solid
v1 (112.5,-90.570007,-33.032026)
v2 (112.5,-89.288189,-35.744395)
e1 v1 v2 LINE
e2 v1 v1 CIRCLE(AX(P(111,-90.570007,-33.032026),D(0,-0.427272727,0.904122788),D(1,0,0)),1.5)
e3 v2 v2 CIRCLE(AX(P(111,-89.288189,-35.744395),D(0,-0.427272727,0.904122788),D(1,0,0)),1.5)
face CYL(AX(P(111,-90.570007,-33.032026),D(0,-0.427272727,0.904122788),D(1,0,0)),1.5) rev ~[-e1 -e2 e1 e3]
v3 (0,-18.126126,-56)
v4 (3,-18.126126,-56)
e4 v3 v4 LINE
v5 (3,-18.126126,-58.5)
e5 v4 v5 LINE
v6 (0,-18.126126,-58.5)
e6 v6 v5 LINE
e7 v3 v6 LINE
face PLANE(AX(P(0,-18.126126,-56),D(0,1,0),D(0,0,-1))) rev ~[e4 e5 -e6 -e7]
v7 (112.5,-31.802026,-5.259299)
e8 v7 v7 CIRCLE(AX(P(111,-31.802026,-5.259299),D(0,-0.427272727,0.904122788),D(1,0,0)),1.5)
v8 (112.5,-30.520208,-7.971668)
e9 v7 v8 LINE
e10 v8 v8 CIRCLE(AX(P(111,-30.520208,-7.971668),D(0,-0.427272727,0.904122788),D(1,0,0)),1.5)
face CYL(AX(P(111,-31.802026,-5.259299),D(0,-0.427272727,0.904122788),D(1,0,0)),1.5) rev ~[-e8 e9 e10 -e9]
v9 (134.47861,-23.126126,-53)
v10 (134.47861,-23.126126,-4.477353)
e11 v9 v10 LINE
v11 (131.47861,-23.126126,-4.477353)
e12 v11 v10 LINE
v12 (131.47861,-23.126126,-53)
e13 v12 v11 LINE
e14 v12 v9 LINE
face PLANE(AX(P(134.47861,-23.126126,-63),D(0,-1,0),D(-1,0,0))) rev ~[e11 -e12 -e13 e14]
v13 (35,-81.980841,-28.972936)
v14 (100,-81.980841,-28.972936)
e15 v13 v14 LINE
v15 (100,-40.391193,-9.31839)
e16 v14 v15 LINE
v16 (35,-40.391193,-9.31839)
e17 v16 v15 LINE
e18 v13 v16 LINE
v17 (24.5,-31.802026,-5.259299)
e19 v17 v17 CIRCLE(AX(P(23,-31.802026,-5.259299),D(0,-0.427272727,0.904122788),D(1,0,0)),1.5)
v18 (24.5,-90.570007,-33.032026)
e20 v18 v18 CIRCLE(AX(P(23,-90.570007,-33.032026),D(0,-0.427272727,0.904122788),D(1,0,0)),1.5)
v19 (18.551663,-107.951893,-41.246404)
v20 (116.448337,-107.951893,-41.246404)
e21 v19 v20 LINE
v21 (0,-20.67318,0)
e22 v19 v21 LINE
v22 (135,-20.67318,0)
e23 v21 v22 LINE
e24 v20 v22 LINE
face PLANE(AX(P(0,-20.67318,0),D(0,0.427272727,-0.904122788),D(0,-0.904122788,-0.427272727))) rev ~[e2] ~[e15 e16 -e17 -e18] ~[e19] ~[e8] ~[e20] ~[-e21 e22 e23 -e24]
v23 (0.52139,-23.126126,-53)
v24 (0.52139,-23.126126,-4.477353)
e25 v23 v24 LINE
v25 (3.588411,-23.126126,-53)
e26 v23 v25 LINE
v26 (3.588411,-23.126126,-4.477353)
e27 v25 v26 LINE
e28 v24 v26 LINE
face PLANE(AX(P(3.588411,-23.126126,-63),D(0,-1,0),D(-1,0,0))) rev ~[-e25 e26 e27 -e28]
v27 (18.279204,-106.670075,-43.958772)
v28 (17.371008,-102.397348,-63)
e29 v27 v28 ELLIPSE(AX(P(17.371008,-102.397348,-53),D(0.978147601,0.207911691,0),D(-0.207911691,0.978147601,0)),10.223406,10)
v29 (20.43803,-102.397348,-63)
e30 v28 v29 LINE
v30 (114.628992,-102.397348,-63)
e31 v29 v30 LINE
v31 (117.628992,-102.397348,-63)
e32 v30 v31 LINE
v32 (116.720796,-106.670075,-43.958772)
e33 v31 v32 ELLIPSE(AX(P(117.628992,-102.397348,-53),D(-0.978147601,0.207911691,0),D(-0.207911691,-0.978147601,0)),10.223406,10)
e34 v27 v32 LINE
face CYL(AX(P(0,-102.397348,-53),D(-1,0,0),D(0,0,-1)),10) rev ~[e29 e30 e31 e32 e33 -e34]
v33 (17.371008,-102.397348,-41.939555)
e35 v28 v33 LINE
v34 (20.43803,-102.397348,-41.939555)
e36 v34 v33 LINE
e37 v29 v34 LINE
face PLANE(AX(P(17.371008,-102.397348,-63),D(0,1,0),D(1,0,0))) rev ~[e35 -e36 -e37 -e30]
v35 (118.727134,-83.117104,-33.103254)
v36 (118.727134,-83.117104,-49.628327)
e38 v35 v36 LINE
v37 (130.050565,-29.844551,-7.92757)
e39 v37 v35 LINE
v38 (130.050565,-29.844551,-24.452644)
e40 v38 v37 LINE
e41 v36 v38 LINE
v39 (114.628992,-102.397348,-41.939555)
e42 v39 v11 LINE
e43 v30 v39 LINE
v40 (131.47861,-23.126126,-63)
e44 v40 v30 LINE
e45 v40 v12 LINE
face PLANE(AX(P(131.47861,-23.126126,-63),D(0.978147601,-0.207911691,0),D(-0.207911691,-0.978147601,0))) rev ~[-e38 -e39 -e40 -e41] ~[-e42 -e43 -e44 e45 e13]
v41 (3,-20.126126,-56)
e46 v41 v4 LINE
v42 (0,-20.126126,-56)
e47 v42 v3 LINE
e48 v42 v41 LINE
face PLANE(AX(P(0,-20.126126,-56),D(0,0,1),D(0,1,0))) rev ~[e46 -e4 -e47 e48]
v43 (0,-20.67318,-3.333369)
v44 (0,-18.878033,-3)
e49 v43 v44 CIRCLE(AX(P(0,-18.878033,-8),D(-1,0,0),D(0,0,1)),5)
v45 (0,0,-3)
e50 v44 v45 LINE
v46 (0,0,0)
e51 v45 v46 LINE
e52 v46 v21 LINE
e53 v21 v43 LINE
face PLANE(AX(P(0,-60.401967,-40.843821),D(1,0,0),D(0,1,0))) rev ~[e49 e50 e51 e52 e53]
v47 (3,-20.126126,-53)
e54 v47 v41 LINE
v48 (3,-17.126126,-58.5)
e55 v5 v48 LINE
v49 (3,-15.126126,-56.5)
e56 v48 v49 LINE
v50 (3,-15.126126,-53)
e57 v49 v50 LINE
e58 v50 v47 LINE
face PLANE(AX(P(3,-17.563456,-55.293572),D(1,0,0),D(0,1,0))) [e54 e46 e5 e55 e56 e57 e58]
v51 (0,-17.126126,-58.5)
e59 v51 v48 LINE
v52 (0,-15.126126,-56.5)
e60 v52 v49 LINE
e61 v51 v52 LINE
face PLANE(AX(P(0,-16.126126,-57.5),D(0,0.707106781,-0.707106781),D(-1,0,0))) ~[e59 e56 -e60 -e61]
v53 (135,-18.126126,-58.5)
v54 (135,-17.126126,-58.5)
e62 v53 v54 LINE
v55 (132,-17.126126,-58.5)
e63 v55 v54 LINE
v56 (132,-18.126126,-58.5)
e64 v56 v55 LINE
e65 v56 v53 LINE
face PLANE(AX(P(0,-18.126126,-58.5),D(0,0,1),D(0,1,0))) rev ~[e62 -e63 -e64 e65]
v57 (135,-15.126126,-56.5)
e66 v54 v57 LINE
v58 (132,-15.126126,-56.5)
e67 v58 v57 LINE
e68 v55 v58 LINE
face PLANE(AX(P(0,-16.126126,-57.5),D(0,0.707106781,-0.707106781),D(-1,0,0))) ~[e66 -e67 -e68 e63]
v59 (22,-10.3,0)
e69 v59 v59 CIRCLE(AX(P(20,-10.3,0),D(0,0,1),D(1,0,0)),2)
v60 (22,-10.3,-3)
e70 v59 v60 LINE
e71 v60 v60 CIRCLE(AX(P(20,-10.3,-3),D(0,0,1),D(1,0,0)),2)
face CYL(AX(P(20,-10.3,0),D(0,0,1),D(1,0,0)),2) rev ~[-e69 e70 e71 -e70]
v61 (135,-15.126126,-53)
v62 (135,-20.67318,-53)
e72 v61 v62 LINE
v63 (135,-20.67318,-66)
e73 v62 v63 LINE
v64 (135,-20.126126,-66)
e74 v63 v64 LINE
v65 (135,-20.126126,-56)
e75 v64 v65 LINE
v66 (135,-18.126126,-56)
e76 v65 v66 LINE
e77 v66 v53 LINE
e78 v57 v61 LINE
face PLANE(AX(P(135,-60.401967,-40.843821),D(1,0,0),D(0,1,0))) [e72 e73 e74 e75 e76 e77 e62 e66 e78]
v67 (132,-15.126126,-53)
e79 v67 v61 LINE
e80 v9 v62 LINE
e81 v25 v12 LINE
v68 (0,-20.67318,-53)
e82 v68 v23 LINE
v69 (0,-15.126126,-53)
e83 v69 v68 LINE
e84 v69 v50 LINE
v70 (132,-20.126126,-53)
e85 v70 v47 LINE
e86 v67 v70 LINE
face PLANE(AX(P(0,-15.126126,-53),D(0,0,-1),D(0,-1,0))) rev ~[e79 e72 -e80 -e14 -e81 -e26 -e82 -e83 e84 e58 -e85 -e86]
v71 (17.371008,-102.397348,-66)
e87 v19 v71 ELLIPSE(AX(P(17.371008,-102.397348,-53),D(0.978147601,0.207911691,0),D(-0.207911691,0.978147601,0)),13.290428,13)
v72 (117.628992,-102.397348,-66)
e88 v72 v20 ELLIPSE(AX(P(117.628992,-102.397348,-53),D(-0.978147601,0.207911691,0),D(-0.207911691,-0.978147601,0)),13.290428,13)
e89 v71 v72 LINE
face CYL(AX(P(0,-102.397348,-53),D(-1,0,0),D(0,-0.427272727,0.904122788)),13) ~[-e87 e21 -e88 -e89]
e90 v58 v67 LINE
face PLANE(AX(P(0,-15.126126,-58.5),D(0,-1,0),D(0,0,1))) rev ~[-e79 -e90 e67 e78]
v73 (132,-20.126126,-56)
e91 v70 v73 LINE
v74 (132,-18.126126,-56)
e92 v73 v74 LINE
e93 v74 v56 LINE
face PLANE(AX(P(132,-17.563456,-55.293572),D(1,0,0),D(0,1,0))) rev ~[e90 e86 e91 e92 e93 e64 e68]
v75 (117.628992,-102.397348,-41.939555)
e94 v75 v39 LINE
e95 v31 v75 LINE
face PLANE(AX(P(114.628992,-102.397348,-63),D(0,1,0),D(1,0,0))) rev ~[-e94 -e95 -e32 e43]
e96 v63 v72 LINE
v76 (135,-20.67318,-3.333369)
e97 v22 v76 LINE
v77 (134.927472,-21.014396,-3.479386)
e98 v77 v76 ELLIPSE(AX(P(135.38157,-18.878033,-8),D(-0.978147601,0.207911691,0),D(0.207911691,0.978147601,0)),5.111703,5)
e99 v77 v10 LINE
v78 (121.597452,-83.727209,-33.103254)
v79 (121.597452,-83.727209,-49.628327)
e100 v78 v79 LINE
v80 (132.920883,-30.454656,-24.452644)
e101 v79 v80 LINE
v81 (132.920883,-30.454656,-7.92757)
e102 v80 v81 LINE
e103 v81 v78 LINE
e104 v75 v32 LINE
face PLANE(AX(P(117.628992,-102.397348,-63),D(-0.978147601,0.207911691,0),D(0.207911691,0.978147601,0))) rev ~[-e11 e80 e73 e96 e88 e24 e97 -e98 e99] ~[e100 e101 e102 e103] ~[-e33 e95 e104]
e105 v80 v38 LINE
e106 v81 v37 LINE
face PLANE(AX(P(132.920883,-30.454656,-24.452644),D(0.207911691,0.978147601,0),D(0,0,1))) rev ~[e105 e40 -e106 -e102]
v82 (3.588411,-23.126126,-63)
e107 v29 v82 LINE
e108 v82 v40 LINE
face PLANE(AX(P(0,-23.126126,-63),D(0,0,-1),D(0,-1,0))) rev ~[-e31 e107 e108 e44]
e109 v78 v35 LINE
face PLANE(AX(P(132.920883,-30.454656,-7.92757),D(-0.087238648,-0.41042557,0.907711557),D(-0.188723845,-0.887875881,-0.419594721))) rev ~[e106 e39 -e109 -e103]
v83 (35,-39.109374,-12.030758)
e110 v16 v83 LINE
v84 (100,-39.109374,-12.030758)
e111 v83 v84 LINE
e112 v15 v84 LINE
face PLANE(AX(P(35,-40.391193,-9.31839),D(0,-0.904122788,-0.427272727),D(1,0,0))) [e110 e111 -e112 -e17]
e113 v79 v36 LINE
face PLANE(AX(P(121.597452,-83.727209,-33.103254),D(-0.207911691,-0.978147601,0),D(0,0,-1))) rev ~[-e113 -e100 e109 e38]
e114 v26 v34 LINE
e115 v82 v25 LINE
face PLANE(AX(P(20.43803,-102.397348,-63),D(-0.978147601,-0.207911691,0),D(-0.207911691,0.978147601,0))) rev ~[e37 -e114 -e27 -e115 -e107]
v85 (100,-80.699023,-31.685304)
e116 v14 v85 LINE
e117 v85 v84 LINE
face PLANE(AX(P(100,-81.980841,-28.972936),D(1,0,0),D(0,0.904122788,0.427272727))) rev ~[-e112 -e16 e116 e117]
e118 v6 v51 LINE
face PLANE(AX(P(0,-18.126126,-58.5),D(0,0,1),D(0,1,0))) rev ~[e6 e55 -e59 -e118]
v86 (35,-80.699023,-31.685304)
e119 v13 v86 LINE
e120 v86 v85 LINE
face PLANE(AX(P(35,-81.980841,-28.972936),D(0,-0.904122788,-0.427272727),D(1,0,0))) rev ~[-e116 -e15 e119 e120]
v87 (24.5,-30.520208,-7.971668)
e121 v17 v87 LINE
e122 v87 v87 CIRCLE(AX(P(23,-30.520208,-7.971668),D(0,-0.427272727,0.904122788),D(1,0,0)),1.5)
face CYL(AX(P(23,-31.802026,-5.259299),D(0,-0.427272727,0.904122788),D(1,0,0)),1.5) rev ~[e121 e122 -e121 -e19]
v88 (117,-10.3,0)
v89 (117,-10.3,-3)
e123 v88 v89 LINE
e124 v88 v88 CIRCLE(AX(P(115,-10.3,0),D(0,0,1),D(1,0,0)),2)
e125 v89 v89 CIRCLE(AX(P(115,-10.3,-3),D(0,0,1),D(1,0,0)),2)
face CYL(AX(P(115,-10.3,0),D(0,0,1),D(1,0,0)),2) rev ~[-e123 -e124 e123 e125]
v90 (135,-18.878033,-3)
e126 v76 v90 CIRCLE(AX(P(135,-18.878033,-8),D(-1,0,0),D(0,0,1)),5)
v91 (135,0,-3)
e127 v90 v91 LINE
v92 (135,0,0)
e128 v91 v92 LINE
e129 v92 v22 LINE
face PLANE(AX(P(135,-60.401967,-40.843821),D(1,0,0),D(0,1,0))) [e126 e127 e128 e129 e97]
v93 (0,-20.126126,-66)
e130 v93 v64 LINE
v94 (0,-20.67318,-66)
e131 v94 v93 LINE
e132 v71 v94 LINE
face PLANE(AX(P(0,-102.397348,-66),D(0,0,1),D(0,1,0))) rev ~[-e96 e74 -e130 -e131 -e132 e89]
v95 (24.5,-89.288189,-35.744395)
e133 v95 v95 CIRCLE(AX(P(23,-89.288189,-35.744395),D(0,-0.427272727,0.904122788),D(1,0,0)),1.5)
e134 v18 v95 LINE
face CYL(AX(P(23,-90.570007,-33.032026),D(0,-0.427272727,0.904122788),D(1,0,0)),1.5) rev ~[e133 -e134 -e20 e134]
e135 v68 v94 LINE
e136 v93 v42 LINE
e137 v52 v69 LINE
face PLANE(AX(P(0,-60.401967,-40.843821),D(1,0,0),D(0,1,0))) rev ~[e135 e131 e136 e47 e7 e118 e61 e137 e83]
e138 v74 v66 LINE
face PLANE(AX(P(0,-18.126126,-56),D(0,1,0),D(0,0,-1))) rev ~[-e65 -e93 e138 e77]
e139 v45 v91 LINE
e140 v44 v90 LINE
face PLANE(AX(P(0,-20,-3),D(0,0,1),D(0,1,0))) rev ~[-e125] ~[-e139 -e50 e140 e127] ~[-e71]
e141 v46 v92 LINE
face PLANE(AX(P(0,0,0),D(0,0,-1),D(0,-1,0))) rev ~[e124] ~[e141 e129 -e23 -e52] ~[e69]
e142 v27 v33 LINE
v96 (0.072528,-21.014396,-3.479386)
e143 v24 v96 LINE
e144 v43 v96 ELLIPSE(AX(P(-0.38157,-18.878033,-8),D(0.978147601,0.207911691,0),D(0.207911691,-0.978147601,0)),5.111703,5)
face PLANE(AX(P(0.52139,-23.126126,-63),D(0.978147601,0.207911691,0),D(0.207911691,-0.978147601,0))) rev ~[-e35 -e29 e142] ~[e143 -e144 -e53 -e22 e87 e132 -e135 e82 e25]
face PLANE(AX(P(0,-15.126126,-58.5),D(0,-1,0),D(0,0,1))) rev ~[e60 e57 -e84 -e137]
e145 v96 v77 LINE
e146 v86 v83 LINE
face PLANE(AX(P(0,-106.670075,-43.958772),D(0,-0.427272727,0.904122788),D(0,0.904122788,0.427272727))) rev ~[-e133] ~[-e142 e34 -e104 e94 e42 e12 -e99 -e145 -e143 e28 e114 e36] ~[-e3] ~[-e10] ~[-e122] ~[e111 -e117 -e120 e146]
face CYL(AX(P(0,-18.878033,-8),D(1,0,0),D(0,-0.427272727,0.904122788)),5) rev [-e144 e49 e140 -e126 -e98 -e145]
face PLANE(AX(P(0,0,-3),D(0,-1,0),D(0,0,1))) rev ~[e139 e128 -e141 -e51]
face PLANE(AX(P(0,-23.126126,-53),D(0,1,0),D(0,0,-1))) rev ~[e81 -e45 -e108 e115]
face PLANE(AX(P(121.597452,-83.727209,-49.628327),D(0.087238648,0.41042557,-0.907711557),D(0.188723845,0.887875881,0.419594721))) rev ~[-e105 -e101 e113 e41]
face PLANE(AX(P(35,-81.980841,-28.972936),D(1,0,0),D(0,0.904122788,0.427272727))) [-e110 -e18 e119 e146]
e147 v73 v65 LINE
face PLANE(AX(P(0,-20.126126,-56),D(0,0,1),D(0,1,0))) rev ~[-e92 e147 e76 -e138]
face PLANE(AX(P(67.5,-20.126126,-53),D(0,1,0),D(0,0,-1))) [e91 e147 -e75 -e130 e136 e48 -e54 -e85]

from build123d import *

# Parameters (mm, degrees)
F1_DEPTH       = 135
F2_R           = 1.5
F2_W           = 65
F2_H           = 46
F3_DEPTH       = 3
F4_R           = 2
F5_DEPTH       = 3
F6_SIZE        = 2
F7_R           = 5
F10_DEPTH      = 116
F15_DEPTH      = 64.5
F15_DEPTH_BACK = 64.5
F17_REACH      = 144.7359325659
F19_DEPTH      = 2.9344428022


# Not quite as in the source:
# - a feature names something its author has since deleted; it is built from what else it names


with BuildPart() as f1:
    # F0 (on Right) → F1 (new body)
    with BuildSketch(Plane.YZ):
        with BuildLine():
            Line((-106.670074853, -43.9587721159), (-20, -3))
            Line((-20, -3), (0, -3))
            Line((0, -3), (0, 0))
            Line((0, 0), (-20.6731804218, 0))
            Line((-20.6731804218, 0), (-107.9518930349, -41.2464037506))
            ThreePointArc((-107.9518930349, -41.2464037506), (-115.0819199271, -55.8463352542), (-102.3973475803, -66))
            Line((-102.3973475803, -66), (-20.1261255298, -66))
            Line((-20.1261255298, -66), (-20.1261255298, -56))
            Line((-20.1261255298, -56), (-18.1261255298, -56))
            Line((-18.1261255298, -56), (-18.1261255298, -58.5))
            Line((-18.1261255298, -58.5), (-15.1261255298, -58.5))
            Line((-15.1261255298, -58.5), (-15.1261255298, -53))
            Line((-15.1261255298, -53), (-23.1261255298, -53))
            Line((-23.1261255298, -53), (-23.1261255298, -63))
            Line((-23.1261255298, -63), (-102.3973475803, -63))
            ThreePointArc((-102.3973475803, -63), (-112.154710924, -55.189488657), (-106.670074853, -43.9587721159))
        make_face()
    extrude(amount=F1_DEPTH)

    # F2 (on face) → F3 (cut, through all)
    with BuildSketch(Plane(origin=(0, -3.7741368225, 7.9861945076), x_dir=(1, 0, 0), z_dir=(0, -0.4272727273, 0.9041227884))):
        with Locations((23, -31.0000917132)):
            Circle(F2_R)
        with Locations((111, -31.0000917132)):
            Circle(F2_R)
        with Locations((111, -96.0000917132)):
            Circle(F2_R)
        with Locations((23, -96.0000917132)):
            Circle(F2_R)
        with Locations((67.5, -63.5000917132)):
            Rectangle(F2_W, F2_H)
    extrude(amount=-F3_DEPTH, mode=Mode.SUBTRACT)

    # F4 (on face) → F5 (cut, through all)
    with BuildSketch(Plane.XY):
        with Locations((20, -10.3)):
            Circle(F4_R)
        with Locations((115, -10.3)):
            Circle(F4_R)
    extrude(amount=-F5_DEPTH, mode=Mode.SUBTRACT)

    # F6
    f6_edges = [f1.edges().sort_by_distance(p)[0] for p in [
        (67.5, -15.126126, -58.5),
    ]]
    chamfer(f6_edges, length=F6_SIZE)

    # F7
    f7_edges = [f1.edges().sort_by_distance(p)[0] for p in [
        (67.5, -20, -3),
    ]]
    fillet(f7_edges, radius=F7_R)

    # F9 (on offset) → F10 (cut, through all)
    with BuildSketch(Plane.XY.offset(50)):
        Polygon((26.5695702088, -145.6731804218), (0, -20.6731804218), (0, -145.6731804218), align=None)
        Polygon((135, -145.6731804218), (135, -20.6731804218), (108.4304297912, -145.6731804218), align=None)
    extrude(amount=-F10_DEPTH, mode=Mode.SUBTRACT)

    # F11 (on face) → F12 (join, up to the next surface of F1)
    with BuildSketch(Plane.XY.offset(-63)):
        Polygon((114.6289920234, -102.3973475803), (117.6289920234, -102.3973475803), (134.4786104219, -23.1261255298), (131.4786104219, -23.1261255298), align=None)
    extrude(until=Until.NEXT)

    # F14 (on offset) → F15 (cut, two sides)
    with BuildSketch(Plane.YZ.offset(67.5)) as f15_sk:
        Polygon((-15.1261255298, -53), (-20.1261255298, -53), (-20.1261255298, -56), (-18.1261255298, -56), (-18.1261255298, -58.5), (-17.1261255298, -58.5), (-15.1261255298, -56.5), align=None)
    extrude(amount=-F15_DEPTH, mode=Mode.SUBTRACT)
    extrude(f15_sk.sketch, amount=F15_DEPTH_BACK, mode=Mode.SUBTRACT)

    f17_end = f1.faces().sort_by_distance((10.9056419214, -64.0293542161, -20.4893747382))[0]
    # F16 (on face) → F17 (join, up to a face of the model that its end follows)
    with BuildSketch(Plane.XY.offset(-63)):
        Polygon((0.5213895781, -23.1261255298), (17.3710079766, -102.3973475803), (20.4380297612, -102.3973475803), (3.5884113627, -23.1261255298), align=None)
    f17_long = extrude(amount=F17_REACH, mode=Mode.PRIVATE)
    add(split(f17_long, bisect_by=f17_end, keep=Keep.BOTTOM, mode=Mode.PRIVATE))

    # F18 (on face) → F19 (cut, through all)
    with BuildSketch(Plane(origin=(133.3685883941, -28.3483685838, 0), x_dir=(0.2079116908, 0.9781476007, 0), z_dir=(0.9781476007, -0.2079116908, 0))):
        Polygon((-2.1533435687, -7.9275703375), (-56.6160369654, -33.1032536049), (-56.6160369654, -49.6283268957), (-2.1533435687, -24.4526436284), align=None)
    extrude(amount=-F19_DEPTH, mode=Mode.SUBTRACT)


solid = f1.part
